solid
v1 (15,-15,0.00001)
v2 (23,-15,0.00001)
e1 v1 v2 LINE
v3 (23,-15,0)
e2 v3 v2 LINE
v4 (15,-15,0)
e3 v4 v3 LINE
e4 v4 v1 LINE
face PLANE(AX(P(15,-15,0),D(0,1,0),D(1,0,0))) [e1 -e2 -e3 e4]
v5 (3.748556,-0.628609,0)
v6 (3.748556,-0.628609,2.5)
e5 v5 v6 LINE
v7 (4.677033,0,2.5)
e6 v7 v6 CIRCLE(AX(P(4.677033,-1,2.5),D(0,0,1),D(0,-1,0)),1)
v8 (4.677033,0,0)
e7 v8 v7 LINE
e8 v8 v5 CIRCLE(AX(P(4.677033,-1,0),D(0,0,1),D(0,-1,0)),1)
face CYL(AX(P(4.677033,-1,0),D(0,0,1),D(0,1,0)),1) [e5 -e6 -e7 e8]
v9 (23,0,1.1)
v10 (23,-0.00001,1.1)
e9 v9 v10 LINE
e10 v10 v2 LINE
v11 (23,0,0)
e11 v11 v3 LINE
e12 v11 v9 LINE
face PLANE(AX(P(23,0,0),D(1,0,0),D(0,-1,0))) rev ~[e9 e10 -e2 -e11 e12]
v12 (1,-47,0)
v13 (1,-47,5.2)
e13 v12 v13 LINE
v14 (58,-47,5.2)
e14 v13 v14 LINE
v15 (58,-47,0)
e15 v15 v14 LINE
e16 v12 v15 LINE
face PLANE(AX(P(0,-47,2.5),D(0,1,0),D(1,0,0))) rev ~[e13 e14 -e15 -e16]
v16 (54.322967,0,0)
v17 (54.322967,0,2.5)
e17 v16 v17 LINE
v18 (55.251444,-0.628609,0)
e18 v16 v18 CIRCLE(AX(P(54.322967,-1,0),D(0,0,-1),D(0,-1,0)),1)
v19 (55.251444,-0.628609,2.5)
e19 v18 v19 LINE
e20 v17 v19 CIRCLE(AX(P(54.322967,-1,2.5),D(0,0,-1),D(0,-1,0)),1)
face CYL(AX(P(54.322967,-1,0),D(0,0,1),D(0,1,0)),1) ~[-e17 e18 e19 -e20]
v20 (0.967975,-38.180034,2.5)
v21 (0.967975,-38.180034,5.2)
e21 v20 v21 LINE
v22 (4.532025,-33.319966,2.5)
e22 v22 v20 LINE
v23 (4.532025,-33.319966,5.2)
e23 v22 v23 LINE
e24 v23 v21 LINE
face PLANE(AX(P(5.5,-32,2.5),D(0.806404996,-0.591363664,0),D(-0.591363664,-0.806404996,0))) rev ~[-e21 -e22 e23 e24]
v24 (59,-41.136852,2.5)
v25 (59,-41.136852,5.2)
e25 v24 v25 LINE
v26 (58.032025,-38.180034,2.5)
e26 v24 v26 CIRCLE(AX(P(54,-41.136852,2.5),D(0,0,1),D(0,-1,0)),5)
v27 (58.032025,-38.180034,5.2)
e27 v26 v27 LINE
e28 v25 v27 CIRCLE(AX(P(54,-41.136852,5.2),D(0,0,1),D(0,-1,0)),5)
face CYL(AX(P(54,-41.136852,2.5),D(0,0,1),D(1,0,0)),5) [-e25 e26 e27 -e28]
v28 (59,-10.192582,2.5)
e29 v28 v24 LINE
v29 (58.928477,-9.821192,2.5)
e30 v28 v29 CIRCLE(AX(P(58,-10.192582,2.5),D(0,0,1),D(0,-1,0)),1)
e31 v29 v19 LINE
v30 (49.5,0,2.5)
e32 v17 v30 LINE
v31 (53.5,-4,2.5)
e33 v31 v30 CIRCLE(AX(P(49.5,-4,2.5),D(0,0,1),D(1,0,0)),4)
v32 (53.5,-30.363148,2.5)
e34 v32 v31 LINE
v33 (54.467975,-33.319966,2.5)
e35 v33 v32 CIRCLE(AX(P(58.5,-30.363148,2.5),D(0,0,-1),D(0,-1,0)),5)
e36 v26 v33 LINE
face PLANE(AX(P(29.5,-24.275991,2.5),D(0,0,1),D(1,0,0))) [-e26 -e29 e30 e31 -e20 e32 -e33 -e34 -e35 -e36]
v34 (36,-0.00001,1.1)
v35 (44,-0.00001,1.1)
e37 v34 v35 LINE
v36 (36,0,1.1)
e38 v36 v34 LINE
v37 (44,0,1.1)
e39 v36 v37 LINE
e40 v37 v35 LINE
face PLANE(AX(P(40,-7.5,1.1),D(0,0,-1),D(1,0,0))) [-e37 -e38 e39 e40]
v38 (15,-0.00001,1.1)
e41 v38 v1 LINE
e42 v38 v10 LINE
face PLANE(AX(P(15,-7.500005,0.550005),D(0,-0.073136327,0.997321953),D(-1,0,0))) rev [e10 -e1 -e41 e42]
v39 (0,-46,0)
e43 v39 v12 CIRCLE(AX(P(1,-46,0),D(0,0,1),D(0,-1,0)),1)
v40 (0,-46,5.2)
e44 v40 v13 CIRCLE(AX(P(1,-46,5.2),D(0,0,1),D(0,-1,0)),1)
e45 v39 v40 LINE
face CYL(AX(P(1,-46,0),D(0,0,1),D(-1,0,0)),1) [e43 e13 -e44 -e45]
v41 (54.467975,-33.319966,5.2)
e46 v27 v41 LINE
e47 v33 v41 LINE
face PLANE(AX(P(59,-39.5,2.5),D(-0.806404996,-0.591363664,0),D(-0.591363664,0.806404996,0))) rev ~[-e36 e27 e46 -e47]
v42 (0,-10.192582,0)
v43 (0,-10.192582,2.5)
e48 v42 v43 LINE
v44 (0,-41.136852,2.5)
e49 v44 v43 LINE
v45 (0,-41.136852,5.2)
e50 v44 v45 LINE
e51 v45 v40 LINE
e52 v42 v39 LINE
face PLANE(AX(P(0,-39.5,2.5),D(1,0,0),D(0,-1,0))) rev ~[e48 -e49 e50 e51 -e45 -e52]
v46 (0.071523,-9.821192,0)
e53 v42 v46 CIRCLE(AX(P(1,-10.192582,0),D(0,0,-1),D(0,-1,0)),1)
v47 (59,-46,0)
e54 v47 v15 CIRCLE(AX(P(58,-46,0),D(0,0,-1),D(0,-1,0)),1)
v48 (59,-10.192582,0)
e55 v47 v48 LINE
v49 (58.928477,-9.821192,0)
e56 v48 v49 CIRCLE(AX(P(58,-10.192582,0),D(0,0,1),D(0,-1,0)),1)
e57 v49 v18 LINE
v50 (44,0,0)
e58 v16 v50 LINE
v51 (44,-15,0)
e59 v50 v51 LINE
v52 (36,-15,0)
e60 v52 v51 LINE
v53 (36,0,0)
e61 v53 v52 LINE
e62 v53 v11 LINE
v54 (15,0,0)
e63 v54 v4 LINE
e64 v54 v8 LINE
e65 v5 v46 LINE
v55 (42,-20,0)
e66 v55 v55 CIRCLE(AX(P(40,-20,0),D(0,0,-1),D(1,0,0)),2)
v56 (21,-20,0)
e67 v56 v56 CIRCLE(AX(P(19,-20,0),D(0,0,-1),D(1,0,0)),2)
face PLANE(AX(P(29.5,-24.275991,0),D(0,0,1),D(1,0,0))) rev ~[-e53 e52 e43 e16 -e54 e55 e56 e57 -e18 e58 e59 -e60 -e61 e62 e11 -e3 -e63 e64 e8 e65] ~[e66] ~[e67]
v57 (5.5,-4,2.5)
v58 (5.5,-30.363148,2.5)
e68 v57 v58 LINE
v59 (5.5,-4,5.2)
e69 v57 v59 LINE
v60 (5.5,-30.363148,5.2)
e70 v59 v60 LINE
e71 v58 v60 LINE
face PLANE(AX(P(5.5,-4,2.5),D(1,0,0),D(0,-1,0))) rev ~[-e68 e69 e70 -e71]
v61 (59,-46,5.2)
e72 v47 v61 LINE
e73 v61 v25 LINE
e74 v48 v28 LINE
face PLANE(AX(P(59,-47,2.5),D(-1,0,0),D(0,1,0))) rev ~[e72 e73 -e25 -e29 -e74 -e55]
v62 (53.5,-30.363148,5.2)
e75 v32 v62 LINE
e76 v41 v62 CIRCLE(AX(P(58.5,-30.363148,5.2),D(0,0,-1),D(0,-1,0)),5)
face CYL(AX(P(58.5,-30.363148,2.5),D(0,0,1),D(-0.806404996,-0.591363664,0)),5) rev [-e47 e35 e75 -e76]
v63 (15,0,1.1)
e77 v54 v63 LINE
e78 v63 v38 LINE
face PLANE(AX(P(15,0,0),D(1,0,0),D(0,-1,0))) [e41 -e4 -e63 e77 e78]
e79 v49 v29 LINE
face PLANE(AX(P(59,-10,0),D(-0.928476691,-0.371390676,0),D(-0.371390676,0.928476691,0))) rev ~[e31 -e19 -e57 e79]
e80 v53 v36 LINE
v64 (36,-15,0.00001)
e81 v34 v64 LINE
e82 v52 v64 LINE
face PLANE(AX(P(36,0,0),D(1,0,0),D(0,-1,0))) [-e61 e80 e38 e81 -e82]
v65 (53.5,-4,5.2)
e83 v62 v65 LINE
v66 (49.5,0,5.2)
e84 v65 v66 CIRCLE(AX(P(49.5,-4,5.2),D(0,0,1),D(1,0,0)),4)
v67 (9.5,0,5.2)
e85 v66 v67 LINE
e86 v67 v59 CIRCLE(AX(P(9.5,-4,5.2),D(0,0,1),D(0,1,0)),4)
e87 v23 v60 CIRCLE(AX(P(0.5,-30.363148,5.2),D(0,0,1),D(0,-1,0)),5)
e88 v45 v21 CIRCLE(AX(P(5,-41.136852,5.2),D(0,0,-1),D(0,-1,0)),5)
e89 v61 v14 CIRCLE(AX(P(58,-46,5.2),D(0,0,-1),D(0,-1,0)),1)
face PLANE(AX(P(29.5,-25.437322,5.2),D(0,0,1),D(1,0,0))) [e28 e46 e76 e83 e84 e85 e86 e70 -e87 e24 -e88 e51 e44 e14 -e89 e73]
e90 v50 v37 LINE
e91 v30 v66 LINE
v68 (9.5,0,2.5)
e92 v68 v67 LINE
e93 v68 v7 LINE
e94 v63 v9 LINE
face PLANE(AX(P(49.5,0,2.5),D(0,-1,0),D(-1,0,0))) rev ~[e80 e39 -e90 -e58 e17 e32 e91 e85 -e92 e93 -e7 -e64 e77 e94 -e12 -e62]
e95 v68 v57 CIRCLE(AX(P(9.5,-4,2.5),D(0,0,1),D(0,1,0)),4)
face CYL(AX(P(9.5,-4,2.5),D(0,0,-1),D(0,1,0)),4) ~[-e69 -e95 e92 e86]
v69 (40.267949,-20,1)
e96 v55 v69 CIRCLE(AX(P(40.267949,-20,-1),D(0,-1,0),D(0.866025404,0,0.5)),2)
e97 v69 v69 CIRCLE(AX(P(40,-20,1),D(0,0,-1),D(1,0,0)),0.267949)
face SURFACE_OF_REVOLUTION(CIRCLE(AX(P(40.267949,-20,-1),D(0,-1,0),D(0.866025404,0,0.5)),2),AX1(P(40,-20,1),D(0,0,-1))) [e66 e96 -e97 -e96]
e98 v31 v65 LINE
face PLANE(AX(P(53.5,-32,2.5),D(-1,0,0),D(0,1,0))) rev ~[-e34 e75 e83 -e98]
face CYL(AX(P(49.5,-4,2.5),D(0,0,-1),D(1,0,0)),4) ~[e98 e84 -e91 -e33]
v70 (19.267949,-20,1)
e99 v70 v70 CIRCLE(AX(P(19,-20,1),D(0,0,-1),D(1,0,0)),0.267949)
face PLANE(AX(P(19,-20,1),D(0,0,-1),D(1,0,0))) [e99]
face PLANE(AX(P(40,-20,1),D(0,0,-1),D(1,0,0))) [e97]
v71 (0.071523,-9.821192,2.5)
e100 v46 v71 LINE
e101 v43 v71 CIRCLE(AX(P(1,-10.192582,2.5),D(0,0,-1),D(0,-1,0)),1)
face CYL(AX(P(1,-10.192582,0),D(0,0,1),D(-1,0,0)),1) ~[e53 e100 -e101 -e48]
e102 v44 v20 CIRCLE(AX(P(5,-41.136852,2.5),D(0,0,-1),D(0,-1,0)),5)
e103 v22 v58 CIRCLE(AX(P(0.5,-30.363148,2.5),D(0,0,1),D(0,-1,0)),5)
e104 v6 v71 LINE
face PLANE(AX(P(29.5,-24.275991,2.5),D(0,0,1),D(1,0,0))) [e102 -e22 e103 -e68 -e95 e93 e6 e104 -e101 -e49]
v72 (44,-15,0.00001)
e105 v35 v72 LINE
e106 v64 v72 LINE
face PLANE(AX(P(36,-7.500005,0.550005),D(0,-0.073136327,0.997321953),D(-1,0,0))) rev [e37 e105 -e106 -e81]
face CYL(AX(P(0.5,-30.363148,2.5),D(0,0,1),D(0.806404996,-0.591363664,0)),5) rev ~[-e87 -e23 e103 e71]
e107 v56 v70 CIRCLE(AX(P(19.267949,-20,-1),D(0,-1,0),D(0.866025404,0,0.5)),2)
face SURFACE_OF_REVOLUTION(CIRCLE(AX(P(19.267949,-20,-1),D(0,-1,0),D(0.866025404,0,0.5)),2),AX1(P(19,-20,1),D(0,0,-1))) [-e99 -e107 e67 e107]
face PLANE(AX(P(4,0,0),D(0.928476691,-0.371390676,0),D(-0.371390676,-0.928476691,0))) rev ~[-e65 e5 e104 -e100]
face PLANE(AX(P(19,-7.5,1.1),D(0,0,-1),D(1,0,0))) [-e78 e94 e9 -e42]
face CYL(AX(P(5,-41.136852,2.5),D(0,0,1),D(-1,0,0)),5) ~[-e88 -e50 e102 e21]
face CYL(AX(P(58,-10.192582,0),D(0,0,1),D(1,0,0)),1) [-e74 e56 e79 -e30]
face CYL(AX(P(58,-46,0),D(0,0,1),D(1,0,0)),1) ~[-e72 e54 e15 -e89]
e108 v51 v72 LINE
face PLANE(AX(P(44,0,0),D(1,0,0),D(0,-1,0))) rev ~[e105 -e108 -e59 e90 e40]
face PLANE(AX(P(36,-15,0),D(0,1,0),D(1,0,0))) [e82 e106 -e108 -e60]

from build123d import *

# Parameters (mm, degrees)
F1_DEPTH    = 2.5
F3_DEPTH    = 2.7
F4_R        = 1
F5_R        = 5
F7_R        = 2
F8_DEPTH    = 1
F6_W        = 8
F6_H        = 15
F9_DEPTH    = 1.1
F10_SIZE2   = 1.09999
F10_SIZE    = 14.99999
F10_2_SIZE2 = 1.09999
F10_2_SIZE  = 14.99999


# Not quite as in the source:
# - a fillet or chamfer that OpenCascade refuses, or shapes differently, is made with other operations: its cross-section is extruded or revolved along the edge and cut away or added
# - two fillets or chamfers of one size are made in one step
# - a fillet or chamfer is up to 0.001 mm smaller than in the source, because OpenCascade refuses the exact size


with BuildPart() as f1:
    # F0 (on Top) → F1 (new body)
    with BuildSketch(Plane.XY):
        Polygon((55, 0), (4, 0), (0, -10), (0, -47), (59, -47), (59, -10), align=None)
    extrude(amount=F1_DEPTH)

    # F2 (on face) → F3 (join)
    with BuildSketch(Plane.XY.offset(2.5)):
        with BuildLine():
            Line((0, -39.5), (0, -47))
            Line((0, -47), (59, -47))
            Line((59, -47), (59, -39.5))
            Line((59, -39.5), (53.5, -32))
            Line((53.5, -32), (53.5, -4))
            ThreePointArc((53.5, -4), (52.3284271247, -1.1715728753), (49.5, 0))
            Line((49.5, 0), (9.5, 0))
            ThreePointArc((9.5, 0), (6.6715728753, -1.1715728753), (5.5, -4))
            Line((5.5, -4), (5.5, -32))
            Line((5.5, -32), (0, -39.5))
        make_face()
    extrude(amount=F3_DEPTH)

    # F4
    f4_edges = [f1.edges().sort_by_distance(p)[0] for p in [
        (0, -47, 2.6),
        (59, -47, 2.6),
        (4, 0, 1.25),
        (55, 0, 1.25),
        (59, -10, 1.25),
        (0, -10, 1.25),
    ]]
    fillet(f4_edges, radius=F4_R)

    # F5
    f5_edges = [f1.edges().sort_by_distance(p)[0] for p in [
        (0, -39.5, 3.85),
        (59, -39.5, 3.85),
        (53.5, -32, 3.85),
        (5.5, -32, 3.85),
    ]]
    fillet(f5_edges, radius=F5_R)

    # F7 (on face) → F8 (cut)
    with BuildSketch(Plane(origin=(0, 0, 0), x_dir=(1, 0, 0), z_dir=(0, 0, -1))):
        with Locations((19, 20)):
            Circle(F7_R)
        with Locations((40, 20)):
            Circle(F7_R)
    extrude(amount=-F8_DEPTH, mode=Mode.SUBTRACT)

    # F6 (on face) → F9 (cut)
    with BuildSketch(Plane(origin=(0, 0, 0), x_dir=(1, 0, 0), z_dir=(0, 0, -1))):
        with Locations((40, 7.5)):
            Rectangle(F6_W, F6_H)
        with Locations((19, 7.5)):
            Rectangle(F6_W, F6_H)
    extrude(amount=-F9_DEPTH, mode=Mode.SUBTRACT)

    # F10 (size 15 and 1.1 in the source; OpenCascade refuses exactly that, so slightly less here)
    f10_edges = [f1.edges().sort_by_distance(p)[0] for p in [
        (40, -15, 1.1),
    ]]
    f10_side = f1.faces().sort_by_distance((40, -7.5, 1.1))[0]
    chamfer(f10_edges, length=F10_SIZE, length2=F10_SIZE2, reference=f10_side)

    # F10#2 (size 15 and 1.1 in the source; OpenCascade refuses exactly that, so slightly less here)
    f10_2_edges = [f1.edges().sort_by_distance(p)[0] for p in [
        (19, -15, 1.1),
    ]]
    f10_2_side = f1.faces().sort_by_distance((19, -7.5, 1.1))[0]
    chamfer(f10_2_edges, length=F10_2_SIZE, length2=F10_2_SIZE2, reference=f10_2_side)

    # F12: fillet of radius 2 on 2 edges, made by hand

    # F12_s1 → F12_t2 (revolve)
    with BuildSketch(Plane.XZ.offset(20)):
        with BuildLine():
            ThreePointArc((42, 0), (41.2679491924, 0.7320508076), (40.2679491924, 1))
            Line((40.2679491924, 1), (42, 1))
            Line((42, 1), (42, 0))
        make_face()
    revolve(axis=Axis((40, -20, 1), (0, 0, -1)))

    # F12_s3 → F12_t4 (revolve)
    with BuildSketch(Plane.XZ.offset(20)):
        with BuildLine():
            ThreePointArc((21, 0), (20.2679491924, 0.7320508076), (19.2679491924, 1))
            Line((19.2679491924, 1), (21, 1))
            Line((21, 1), (21, 0))
        make_face()
    revolve(axis=Axis((19, -20, 1), (0, 0, -1)))


solid = f1.part
